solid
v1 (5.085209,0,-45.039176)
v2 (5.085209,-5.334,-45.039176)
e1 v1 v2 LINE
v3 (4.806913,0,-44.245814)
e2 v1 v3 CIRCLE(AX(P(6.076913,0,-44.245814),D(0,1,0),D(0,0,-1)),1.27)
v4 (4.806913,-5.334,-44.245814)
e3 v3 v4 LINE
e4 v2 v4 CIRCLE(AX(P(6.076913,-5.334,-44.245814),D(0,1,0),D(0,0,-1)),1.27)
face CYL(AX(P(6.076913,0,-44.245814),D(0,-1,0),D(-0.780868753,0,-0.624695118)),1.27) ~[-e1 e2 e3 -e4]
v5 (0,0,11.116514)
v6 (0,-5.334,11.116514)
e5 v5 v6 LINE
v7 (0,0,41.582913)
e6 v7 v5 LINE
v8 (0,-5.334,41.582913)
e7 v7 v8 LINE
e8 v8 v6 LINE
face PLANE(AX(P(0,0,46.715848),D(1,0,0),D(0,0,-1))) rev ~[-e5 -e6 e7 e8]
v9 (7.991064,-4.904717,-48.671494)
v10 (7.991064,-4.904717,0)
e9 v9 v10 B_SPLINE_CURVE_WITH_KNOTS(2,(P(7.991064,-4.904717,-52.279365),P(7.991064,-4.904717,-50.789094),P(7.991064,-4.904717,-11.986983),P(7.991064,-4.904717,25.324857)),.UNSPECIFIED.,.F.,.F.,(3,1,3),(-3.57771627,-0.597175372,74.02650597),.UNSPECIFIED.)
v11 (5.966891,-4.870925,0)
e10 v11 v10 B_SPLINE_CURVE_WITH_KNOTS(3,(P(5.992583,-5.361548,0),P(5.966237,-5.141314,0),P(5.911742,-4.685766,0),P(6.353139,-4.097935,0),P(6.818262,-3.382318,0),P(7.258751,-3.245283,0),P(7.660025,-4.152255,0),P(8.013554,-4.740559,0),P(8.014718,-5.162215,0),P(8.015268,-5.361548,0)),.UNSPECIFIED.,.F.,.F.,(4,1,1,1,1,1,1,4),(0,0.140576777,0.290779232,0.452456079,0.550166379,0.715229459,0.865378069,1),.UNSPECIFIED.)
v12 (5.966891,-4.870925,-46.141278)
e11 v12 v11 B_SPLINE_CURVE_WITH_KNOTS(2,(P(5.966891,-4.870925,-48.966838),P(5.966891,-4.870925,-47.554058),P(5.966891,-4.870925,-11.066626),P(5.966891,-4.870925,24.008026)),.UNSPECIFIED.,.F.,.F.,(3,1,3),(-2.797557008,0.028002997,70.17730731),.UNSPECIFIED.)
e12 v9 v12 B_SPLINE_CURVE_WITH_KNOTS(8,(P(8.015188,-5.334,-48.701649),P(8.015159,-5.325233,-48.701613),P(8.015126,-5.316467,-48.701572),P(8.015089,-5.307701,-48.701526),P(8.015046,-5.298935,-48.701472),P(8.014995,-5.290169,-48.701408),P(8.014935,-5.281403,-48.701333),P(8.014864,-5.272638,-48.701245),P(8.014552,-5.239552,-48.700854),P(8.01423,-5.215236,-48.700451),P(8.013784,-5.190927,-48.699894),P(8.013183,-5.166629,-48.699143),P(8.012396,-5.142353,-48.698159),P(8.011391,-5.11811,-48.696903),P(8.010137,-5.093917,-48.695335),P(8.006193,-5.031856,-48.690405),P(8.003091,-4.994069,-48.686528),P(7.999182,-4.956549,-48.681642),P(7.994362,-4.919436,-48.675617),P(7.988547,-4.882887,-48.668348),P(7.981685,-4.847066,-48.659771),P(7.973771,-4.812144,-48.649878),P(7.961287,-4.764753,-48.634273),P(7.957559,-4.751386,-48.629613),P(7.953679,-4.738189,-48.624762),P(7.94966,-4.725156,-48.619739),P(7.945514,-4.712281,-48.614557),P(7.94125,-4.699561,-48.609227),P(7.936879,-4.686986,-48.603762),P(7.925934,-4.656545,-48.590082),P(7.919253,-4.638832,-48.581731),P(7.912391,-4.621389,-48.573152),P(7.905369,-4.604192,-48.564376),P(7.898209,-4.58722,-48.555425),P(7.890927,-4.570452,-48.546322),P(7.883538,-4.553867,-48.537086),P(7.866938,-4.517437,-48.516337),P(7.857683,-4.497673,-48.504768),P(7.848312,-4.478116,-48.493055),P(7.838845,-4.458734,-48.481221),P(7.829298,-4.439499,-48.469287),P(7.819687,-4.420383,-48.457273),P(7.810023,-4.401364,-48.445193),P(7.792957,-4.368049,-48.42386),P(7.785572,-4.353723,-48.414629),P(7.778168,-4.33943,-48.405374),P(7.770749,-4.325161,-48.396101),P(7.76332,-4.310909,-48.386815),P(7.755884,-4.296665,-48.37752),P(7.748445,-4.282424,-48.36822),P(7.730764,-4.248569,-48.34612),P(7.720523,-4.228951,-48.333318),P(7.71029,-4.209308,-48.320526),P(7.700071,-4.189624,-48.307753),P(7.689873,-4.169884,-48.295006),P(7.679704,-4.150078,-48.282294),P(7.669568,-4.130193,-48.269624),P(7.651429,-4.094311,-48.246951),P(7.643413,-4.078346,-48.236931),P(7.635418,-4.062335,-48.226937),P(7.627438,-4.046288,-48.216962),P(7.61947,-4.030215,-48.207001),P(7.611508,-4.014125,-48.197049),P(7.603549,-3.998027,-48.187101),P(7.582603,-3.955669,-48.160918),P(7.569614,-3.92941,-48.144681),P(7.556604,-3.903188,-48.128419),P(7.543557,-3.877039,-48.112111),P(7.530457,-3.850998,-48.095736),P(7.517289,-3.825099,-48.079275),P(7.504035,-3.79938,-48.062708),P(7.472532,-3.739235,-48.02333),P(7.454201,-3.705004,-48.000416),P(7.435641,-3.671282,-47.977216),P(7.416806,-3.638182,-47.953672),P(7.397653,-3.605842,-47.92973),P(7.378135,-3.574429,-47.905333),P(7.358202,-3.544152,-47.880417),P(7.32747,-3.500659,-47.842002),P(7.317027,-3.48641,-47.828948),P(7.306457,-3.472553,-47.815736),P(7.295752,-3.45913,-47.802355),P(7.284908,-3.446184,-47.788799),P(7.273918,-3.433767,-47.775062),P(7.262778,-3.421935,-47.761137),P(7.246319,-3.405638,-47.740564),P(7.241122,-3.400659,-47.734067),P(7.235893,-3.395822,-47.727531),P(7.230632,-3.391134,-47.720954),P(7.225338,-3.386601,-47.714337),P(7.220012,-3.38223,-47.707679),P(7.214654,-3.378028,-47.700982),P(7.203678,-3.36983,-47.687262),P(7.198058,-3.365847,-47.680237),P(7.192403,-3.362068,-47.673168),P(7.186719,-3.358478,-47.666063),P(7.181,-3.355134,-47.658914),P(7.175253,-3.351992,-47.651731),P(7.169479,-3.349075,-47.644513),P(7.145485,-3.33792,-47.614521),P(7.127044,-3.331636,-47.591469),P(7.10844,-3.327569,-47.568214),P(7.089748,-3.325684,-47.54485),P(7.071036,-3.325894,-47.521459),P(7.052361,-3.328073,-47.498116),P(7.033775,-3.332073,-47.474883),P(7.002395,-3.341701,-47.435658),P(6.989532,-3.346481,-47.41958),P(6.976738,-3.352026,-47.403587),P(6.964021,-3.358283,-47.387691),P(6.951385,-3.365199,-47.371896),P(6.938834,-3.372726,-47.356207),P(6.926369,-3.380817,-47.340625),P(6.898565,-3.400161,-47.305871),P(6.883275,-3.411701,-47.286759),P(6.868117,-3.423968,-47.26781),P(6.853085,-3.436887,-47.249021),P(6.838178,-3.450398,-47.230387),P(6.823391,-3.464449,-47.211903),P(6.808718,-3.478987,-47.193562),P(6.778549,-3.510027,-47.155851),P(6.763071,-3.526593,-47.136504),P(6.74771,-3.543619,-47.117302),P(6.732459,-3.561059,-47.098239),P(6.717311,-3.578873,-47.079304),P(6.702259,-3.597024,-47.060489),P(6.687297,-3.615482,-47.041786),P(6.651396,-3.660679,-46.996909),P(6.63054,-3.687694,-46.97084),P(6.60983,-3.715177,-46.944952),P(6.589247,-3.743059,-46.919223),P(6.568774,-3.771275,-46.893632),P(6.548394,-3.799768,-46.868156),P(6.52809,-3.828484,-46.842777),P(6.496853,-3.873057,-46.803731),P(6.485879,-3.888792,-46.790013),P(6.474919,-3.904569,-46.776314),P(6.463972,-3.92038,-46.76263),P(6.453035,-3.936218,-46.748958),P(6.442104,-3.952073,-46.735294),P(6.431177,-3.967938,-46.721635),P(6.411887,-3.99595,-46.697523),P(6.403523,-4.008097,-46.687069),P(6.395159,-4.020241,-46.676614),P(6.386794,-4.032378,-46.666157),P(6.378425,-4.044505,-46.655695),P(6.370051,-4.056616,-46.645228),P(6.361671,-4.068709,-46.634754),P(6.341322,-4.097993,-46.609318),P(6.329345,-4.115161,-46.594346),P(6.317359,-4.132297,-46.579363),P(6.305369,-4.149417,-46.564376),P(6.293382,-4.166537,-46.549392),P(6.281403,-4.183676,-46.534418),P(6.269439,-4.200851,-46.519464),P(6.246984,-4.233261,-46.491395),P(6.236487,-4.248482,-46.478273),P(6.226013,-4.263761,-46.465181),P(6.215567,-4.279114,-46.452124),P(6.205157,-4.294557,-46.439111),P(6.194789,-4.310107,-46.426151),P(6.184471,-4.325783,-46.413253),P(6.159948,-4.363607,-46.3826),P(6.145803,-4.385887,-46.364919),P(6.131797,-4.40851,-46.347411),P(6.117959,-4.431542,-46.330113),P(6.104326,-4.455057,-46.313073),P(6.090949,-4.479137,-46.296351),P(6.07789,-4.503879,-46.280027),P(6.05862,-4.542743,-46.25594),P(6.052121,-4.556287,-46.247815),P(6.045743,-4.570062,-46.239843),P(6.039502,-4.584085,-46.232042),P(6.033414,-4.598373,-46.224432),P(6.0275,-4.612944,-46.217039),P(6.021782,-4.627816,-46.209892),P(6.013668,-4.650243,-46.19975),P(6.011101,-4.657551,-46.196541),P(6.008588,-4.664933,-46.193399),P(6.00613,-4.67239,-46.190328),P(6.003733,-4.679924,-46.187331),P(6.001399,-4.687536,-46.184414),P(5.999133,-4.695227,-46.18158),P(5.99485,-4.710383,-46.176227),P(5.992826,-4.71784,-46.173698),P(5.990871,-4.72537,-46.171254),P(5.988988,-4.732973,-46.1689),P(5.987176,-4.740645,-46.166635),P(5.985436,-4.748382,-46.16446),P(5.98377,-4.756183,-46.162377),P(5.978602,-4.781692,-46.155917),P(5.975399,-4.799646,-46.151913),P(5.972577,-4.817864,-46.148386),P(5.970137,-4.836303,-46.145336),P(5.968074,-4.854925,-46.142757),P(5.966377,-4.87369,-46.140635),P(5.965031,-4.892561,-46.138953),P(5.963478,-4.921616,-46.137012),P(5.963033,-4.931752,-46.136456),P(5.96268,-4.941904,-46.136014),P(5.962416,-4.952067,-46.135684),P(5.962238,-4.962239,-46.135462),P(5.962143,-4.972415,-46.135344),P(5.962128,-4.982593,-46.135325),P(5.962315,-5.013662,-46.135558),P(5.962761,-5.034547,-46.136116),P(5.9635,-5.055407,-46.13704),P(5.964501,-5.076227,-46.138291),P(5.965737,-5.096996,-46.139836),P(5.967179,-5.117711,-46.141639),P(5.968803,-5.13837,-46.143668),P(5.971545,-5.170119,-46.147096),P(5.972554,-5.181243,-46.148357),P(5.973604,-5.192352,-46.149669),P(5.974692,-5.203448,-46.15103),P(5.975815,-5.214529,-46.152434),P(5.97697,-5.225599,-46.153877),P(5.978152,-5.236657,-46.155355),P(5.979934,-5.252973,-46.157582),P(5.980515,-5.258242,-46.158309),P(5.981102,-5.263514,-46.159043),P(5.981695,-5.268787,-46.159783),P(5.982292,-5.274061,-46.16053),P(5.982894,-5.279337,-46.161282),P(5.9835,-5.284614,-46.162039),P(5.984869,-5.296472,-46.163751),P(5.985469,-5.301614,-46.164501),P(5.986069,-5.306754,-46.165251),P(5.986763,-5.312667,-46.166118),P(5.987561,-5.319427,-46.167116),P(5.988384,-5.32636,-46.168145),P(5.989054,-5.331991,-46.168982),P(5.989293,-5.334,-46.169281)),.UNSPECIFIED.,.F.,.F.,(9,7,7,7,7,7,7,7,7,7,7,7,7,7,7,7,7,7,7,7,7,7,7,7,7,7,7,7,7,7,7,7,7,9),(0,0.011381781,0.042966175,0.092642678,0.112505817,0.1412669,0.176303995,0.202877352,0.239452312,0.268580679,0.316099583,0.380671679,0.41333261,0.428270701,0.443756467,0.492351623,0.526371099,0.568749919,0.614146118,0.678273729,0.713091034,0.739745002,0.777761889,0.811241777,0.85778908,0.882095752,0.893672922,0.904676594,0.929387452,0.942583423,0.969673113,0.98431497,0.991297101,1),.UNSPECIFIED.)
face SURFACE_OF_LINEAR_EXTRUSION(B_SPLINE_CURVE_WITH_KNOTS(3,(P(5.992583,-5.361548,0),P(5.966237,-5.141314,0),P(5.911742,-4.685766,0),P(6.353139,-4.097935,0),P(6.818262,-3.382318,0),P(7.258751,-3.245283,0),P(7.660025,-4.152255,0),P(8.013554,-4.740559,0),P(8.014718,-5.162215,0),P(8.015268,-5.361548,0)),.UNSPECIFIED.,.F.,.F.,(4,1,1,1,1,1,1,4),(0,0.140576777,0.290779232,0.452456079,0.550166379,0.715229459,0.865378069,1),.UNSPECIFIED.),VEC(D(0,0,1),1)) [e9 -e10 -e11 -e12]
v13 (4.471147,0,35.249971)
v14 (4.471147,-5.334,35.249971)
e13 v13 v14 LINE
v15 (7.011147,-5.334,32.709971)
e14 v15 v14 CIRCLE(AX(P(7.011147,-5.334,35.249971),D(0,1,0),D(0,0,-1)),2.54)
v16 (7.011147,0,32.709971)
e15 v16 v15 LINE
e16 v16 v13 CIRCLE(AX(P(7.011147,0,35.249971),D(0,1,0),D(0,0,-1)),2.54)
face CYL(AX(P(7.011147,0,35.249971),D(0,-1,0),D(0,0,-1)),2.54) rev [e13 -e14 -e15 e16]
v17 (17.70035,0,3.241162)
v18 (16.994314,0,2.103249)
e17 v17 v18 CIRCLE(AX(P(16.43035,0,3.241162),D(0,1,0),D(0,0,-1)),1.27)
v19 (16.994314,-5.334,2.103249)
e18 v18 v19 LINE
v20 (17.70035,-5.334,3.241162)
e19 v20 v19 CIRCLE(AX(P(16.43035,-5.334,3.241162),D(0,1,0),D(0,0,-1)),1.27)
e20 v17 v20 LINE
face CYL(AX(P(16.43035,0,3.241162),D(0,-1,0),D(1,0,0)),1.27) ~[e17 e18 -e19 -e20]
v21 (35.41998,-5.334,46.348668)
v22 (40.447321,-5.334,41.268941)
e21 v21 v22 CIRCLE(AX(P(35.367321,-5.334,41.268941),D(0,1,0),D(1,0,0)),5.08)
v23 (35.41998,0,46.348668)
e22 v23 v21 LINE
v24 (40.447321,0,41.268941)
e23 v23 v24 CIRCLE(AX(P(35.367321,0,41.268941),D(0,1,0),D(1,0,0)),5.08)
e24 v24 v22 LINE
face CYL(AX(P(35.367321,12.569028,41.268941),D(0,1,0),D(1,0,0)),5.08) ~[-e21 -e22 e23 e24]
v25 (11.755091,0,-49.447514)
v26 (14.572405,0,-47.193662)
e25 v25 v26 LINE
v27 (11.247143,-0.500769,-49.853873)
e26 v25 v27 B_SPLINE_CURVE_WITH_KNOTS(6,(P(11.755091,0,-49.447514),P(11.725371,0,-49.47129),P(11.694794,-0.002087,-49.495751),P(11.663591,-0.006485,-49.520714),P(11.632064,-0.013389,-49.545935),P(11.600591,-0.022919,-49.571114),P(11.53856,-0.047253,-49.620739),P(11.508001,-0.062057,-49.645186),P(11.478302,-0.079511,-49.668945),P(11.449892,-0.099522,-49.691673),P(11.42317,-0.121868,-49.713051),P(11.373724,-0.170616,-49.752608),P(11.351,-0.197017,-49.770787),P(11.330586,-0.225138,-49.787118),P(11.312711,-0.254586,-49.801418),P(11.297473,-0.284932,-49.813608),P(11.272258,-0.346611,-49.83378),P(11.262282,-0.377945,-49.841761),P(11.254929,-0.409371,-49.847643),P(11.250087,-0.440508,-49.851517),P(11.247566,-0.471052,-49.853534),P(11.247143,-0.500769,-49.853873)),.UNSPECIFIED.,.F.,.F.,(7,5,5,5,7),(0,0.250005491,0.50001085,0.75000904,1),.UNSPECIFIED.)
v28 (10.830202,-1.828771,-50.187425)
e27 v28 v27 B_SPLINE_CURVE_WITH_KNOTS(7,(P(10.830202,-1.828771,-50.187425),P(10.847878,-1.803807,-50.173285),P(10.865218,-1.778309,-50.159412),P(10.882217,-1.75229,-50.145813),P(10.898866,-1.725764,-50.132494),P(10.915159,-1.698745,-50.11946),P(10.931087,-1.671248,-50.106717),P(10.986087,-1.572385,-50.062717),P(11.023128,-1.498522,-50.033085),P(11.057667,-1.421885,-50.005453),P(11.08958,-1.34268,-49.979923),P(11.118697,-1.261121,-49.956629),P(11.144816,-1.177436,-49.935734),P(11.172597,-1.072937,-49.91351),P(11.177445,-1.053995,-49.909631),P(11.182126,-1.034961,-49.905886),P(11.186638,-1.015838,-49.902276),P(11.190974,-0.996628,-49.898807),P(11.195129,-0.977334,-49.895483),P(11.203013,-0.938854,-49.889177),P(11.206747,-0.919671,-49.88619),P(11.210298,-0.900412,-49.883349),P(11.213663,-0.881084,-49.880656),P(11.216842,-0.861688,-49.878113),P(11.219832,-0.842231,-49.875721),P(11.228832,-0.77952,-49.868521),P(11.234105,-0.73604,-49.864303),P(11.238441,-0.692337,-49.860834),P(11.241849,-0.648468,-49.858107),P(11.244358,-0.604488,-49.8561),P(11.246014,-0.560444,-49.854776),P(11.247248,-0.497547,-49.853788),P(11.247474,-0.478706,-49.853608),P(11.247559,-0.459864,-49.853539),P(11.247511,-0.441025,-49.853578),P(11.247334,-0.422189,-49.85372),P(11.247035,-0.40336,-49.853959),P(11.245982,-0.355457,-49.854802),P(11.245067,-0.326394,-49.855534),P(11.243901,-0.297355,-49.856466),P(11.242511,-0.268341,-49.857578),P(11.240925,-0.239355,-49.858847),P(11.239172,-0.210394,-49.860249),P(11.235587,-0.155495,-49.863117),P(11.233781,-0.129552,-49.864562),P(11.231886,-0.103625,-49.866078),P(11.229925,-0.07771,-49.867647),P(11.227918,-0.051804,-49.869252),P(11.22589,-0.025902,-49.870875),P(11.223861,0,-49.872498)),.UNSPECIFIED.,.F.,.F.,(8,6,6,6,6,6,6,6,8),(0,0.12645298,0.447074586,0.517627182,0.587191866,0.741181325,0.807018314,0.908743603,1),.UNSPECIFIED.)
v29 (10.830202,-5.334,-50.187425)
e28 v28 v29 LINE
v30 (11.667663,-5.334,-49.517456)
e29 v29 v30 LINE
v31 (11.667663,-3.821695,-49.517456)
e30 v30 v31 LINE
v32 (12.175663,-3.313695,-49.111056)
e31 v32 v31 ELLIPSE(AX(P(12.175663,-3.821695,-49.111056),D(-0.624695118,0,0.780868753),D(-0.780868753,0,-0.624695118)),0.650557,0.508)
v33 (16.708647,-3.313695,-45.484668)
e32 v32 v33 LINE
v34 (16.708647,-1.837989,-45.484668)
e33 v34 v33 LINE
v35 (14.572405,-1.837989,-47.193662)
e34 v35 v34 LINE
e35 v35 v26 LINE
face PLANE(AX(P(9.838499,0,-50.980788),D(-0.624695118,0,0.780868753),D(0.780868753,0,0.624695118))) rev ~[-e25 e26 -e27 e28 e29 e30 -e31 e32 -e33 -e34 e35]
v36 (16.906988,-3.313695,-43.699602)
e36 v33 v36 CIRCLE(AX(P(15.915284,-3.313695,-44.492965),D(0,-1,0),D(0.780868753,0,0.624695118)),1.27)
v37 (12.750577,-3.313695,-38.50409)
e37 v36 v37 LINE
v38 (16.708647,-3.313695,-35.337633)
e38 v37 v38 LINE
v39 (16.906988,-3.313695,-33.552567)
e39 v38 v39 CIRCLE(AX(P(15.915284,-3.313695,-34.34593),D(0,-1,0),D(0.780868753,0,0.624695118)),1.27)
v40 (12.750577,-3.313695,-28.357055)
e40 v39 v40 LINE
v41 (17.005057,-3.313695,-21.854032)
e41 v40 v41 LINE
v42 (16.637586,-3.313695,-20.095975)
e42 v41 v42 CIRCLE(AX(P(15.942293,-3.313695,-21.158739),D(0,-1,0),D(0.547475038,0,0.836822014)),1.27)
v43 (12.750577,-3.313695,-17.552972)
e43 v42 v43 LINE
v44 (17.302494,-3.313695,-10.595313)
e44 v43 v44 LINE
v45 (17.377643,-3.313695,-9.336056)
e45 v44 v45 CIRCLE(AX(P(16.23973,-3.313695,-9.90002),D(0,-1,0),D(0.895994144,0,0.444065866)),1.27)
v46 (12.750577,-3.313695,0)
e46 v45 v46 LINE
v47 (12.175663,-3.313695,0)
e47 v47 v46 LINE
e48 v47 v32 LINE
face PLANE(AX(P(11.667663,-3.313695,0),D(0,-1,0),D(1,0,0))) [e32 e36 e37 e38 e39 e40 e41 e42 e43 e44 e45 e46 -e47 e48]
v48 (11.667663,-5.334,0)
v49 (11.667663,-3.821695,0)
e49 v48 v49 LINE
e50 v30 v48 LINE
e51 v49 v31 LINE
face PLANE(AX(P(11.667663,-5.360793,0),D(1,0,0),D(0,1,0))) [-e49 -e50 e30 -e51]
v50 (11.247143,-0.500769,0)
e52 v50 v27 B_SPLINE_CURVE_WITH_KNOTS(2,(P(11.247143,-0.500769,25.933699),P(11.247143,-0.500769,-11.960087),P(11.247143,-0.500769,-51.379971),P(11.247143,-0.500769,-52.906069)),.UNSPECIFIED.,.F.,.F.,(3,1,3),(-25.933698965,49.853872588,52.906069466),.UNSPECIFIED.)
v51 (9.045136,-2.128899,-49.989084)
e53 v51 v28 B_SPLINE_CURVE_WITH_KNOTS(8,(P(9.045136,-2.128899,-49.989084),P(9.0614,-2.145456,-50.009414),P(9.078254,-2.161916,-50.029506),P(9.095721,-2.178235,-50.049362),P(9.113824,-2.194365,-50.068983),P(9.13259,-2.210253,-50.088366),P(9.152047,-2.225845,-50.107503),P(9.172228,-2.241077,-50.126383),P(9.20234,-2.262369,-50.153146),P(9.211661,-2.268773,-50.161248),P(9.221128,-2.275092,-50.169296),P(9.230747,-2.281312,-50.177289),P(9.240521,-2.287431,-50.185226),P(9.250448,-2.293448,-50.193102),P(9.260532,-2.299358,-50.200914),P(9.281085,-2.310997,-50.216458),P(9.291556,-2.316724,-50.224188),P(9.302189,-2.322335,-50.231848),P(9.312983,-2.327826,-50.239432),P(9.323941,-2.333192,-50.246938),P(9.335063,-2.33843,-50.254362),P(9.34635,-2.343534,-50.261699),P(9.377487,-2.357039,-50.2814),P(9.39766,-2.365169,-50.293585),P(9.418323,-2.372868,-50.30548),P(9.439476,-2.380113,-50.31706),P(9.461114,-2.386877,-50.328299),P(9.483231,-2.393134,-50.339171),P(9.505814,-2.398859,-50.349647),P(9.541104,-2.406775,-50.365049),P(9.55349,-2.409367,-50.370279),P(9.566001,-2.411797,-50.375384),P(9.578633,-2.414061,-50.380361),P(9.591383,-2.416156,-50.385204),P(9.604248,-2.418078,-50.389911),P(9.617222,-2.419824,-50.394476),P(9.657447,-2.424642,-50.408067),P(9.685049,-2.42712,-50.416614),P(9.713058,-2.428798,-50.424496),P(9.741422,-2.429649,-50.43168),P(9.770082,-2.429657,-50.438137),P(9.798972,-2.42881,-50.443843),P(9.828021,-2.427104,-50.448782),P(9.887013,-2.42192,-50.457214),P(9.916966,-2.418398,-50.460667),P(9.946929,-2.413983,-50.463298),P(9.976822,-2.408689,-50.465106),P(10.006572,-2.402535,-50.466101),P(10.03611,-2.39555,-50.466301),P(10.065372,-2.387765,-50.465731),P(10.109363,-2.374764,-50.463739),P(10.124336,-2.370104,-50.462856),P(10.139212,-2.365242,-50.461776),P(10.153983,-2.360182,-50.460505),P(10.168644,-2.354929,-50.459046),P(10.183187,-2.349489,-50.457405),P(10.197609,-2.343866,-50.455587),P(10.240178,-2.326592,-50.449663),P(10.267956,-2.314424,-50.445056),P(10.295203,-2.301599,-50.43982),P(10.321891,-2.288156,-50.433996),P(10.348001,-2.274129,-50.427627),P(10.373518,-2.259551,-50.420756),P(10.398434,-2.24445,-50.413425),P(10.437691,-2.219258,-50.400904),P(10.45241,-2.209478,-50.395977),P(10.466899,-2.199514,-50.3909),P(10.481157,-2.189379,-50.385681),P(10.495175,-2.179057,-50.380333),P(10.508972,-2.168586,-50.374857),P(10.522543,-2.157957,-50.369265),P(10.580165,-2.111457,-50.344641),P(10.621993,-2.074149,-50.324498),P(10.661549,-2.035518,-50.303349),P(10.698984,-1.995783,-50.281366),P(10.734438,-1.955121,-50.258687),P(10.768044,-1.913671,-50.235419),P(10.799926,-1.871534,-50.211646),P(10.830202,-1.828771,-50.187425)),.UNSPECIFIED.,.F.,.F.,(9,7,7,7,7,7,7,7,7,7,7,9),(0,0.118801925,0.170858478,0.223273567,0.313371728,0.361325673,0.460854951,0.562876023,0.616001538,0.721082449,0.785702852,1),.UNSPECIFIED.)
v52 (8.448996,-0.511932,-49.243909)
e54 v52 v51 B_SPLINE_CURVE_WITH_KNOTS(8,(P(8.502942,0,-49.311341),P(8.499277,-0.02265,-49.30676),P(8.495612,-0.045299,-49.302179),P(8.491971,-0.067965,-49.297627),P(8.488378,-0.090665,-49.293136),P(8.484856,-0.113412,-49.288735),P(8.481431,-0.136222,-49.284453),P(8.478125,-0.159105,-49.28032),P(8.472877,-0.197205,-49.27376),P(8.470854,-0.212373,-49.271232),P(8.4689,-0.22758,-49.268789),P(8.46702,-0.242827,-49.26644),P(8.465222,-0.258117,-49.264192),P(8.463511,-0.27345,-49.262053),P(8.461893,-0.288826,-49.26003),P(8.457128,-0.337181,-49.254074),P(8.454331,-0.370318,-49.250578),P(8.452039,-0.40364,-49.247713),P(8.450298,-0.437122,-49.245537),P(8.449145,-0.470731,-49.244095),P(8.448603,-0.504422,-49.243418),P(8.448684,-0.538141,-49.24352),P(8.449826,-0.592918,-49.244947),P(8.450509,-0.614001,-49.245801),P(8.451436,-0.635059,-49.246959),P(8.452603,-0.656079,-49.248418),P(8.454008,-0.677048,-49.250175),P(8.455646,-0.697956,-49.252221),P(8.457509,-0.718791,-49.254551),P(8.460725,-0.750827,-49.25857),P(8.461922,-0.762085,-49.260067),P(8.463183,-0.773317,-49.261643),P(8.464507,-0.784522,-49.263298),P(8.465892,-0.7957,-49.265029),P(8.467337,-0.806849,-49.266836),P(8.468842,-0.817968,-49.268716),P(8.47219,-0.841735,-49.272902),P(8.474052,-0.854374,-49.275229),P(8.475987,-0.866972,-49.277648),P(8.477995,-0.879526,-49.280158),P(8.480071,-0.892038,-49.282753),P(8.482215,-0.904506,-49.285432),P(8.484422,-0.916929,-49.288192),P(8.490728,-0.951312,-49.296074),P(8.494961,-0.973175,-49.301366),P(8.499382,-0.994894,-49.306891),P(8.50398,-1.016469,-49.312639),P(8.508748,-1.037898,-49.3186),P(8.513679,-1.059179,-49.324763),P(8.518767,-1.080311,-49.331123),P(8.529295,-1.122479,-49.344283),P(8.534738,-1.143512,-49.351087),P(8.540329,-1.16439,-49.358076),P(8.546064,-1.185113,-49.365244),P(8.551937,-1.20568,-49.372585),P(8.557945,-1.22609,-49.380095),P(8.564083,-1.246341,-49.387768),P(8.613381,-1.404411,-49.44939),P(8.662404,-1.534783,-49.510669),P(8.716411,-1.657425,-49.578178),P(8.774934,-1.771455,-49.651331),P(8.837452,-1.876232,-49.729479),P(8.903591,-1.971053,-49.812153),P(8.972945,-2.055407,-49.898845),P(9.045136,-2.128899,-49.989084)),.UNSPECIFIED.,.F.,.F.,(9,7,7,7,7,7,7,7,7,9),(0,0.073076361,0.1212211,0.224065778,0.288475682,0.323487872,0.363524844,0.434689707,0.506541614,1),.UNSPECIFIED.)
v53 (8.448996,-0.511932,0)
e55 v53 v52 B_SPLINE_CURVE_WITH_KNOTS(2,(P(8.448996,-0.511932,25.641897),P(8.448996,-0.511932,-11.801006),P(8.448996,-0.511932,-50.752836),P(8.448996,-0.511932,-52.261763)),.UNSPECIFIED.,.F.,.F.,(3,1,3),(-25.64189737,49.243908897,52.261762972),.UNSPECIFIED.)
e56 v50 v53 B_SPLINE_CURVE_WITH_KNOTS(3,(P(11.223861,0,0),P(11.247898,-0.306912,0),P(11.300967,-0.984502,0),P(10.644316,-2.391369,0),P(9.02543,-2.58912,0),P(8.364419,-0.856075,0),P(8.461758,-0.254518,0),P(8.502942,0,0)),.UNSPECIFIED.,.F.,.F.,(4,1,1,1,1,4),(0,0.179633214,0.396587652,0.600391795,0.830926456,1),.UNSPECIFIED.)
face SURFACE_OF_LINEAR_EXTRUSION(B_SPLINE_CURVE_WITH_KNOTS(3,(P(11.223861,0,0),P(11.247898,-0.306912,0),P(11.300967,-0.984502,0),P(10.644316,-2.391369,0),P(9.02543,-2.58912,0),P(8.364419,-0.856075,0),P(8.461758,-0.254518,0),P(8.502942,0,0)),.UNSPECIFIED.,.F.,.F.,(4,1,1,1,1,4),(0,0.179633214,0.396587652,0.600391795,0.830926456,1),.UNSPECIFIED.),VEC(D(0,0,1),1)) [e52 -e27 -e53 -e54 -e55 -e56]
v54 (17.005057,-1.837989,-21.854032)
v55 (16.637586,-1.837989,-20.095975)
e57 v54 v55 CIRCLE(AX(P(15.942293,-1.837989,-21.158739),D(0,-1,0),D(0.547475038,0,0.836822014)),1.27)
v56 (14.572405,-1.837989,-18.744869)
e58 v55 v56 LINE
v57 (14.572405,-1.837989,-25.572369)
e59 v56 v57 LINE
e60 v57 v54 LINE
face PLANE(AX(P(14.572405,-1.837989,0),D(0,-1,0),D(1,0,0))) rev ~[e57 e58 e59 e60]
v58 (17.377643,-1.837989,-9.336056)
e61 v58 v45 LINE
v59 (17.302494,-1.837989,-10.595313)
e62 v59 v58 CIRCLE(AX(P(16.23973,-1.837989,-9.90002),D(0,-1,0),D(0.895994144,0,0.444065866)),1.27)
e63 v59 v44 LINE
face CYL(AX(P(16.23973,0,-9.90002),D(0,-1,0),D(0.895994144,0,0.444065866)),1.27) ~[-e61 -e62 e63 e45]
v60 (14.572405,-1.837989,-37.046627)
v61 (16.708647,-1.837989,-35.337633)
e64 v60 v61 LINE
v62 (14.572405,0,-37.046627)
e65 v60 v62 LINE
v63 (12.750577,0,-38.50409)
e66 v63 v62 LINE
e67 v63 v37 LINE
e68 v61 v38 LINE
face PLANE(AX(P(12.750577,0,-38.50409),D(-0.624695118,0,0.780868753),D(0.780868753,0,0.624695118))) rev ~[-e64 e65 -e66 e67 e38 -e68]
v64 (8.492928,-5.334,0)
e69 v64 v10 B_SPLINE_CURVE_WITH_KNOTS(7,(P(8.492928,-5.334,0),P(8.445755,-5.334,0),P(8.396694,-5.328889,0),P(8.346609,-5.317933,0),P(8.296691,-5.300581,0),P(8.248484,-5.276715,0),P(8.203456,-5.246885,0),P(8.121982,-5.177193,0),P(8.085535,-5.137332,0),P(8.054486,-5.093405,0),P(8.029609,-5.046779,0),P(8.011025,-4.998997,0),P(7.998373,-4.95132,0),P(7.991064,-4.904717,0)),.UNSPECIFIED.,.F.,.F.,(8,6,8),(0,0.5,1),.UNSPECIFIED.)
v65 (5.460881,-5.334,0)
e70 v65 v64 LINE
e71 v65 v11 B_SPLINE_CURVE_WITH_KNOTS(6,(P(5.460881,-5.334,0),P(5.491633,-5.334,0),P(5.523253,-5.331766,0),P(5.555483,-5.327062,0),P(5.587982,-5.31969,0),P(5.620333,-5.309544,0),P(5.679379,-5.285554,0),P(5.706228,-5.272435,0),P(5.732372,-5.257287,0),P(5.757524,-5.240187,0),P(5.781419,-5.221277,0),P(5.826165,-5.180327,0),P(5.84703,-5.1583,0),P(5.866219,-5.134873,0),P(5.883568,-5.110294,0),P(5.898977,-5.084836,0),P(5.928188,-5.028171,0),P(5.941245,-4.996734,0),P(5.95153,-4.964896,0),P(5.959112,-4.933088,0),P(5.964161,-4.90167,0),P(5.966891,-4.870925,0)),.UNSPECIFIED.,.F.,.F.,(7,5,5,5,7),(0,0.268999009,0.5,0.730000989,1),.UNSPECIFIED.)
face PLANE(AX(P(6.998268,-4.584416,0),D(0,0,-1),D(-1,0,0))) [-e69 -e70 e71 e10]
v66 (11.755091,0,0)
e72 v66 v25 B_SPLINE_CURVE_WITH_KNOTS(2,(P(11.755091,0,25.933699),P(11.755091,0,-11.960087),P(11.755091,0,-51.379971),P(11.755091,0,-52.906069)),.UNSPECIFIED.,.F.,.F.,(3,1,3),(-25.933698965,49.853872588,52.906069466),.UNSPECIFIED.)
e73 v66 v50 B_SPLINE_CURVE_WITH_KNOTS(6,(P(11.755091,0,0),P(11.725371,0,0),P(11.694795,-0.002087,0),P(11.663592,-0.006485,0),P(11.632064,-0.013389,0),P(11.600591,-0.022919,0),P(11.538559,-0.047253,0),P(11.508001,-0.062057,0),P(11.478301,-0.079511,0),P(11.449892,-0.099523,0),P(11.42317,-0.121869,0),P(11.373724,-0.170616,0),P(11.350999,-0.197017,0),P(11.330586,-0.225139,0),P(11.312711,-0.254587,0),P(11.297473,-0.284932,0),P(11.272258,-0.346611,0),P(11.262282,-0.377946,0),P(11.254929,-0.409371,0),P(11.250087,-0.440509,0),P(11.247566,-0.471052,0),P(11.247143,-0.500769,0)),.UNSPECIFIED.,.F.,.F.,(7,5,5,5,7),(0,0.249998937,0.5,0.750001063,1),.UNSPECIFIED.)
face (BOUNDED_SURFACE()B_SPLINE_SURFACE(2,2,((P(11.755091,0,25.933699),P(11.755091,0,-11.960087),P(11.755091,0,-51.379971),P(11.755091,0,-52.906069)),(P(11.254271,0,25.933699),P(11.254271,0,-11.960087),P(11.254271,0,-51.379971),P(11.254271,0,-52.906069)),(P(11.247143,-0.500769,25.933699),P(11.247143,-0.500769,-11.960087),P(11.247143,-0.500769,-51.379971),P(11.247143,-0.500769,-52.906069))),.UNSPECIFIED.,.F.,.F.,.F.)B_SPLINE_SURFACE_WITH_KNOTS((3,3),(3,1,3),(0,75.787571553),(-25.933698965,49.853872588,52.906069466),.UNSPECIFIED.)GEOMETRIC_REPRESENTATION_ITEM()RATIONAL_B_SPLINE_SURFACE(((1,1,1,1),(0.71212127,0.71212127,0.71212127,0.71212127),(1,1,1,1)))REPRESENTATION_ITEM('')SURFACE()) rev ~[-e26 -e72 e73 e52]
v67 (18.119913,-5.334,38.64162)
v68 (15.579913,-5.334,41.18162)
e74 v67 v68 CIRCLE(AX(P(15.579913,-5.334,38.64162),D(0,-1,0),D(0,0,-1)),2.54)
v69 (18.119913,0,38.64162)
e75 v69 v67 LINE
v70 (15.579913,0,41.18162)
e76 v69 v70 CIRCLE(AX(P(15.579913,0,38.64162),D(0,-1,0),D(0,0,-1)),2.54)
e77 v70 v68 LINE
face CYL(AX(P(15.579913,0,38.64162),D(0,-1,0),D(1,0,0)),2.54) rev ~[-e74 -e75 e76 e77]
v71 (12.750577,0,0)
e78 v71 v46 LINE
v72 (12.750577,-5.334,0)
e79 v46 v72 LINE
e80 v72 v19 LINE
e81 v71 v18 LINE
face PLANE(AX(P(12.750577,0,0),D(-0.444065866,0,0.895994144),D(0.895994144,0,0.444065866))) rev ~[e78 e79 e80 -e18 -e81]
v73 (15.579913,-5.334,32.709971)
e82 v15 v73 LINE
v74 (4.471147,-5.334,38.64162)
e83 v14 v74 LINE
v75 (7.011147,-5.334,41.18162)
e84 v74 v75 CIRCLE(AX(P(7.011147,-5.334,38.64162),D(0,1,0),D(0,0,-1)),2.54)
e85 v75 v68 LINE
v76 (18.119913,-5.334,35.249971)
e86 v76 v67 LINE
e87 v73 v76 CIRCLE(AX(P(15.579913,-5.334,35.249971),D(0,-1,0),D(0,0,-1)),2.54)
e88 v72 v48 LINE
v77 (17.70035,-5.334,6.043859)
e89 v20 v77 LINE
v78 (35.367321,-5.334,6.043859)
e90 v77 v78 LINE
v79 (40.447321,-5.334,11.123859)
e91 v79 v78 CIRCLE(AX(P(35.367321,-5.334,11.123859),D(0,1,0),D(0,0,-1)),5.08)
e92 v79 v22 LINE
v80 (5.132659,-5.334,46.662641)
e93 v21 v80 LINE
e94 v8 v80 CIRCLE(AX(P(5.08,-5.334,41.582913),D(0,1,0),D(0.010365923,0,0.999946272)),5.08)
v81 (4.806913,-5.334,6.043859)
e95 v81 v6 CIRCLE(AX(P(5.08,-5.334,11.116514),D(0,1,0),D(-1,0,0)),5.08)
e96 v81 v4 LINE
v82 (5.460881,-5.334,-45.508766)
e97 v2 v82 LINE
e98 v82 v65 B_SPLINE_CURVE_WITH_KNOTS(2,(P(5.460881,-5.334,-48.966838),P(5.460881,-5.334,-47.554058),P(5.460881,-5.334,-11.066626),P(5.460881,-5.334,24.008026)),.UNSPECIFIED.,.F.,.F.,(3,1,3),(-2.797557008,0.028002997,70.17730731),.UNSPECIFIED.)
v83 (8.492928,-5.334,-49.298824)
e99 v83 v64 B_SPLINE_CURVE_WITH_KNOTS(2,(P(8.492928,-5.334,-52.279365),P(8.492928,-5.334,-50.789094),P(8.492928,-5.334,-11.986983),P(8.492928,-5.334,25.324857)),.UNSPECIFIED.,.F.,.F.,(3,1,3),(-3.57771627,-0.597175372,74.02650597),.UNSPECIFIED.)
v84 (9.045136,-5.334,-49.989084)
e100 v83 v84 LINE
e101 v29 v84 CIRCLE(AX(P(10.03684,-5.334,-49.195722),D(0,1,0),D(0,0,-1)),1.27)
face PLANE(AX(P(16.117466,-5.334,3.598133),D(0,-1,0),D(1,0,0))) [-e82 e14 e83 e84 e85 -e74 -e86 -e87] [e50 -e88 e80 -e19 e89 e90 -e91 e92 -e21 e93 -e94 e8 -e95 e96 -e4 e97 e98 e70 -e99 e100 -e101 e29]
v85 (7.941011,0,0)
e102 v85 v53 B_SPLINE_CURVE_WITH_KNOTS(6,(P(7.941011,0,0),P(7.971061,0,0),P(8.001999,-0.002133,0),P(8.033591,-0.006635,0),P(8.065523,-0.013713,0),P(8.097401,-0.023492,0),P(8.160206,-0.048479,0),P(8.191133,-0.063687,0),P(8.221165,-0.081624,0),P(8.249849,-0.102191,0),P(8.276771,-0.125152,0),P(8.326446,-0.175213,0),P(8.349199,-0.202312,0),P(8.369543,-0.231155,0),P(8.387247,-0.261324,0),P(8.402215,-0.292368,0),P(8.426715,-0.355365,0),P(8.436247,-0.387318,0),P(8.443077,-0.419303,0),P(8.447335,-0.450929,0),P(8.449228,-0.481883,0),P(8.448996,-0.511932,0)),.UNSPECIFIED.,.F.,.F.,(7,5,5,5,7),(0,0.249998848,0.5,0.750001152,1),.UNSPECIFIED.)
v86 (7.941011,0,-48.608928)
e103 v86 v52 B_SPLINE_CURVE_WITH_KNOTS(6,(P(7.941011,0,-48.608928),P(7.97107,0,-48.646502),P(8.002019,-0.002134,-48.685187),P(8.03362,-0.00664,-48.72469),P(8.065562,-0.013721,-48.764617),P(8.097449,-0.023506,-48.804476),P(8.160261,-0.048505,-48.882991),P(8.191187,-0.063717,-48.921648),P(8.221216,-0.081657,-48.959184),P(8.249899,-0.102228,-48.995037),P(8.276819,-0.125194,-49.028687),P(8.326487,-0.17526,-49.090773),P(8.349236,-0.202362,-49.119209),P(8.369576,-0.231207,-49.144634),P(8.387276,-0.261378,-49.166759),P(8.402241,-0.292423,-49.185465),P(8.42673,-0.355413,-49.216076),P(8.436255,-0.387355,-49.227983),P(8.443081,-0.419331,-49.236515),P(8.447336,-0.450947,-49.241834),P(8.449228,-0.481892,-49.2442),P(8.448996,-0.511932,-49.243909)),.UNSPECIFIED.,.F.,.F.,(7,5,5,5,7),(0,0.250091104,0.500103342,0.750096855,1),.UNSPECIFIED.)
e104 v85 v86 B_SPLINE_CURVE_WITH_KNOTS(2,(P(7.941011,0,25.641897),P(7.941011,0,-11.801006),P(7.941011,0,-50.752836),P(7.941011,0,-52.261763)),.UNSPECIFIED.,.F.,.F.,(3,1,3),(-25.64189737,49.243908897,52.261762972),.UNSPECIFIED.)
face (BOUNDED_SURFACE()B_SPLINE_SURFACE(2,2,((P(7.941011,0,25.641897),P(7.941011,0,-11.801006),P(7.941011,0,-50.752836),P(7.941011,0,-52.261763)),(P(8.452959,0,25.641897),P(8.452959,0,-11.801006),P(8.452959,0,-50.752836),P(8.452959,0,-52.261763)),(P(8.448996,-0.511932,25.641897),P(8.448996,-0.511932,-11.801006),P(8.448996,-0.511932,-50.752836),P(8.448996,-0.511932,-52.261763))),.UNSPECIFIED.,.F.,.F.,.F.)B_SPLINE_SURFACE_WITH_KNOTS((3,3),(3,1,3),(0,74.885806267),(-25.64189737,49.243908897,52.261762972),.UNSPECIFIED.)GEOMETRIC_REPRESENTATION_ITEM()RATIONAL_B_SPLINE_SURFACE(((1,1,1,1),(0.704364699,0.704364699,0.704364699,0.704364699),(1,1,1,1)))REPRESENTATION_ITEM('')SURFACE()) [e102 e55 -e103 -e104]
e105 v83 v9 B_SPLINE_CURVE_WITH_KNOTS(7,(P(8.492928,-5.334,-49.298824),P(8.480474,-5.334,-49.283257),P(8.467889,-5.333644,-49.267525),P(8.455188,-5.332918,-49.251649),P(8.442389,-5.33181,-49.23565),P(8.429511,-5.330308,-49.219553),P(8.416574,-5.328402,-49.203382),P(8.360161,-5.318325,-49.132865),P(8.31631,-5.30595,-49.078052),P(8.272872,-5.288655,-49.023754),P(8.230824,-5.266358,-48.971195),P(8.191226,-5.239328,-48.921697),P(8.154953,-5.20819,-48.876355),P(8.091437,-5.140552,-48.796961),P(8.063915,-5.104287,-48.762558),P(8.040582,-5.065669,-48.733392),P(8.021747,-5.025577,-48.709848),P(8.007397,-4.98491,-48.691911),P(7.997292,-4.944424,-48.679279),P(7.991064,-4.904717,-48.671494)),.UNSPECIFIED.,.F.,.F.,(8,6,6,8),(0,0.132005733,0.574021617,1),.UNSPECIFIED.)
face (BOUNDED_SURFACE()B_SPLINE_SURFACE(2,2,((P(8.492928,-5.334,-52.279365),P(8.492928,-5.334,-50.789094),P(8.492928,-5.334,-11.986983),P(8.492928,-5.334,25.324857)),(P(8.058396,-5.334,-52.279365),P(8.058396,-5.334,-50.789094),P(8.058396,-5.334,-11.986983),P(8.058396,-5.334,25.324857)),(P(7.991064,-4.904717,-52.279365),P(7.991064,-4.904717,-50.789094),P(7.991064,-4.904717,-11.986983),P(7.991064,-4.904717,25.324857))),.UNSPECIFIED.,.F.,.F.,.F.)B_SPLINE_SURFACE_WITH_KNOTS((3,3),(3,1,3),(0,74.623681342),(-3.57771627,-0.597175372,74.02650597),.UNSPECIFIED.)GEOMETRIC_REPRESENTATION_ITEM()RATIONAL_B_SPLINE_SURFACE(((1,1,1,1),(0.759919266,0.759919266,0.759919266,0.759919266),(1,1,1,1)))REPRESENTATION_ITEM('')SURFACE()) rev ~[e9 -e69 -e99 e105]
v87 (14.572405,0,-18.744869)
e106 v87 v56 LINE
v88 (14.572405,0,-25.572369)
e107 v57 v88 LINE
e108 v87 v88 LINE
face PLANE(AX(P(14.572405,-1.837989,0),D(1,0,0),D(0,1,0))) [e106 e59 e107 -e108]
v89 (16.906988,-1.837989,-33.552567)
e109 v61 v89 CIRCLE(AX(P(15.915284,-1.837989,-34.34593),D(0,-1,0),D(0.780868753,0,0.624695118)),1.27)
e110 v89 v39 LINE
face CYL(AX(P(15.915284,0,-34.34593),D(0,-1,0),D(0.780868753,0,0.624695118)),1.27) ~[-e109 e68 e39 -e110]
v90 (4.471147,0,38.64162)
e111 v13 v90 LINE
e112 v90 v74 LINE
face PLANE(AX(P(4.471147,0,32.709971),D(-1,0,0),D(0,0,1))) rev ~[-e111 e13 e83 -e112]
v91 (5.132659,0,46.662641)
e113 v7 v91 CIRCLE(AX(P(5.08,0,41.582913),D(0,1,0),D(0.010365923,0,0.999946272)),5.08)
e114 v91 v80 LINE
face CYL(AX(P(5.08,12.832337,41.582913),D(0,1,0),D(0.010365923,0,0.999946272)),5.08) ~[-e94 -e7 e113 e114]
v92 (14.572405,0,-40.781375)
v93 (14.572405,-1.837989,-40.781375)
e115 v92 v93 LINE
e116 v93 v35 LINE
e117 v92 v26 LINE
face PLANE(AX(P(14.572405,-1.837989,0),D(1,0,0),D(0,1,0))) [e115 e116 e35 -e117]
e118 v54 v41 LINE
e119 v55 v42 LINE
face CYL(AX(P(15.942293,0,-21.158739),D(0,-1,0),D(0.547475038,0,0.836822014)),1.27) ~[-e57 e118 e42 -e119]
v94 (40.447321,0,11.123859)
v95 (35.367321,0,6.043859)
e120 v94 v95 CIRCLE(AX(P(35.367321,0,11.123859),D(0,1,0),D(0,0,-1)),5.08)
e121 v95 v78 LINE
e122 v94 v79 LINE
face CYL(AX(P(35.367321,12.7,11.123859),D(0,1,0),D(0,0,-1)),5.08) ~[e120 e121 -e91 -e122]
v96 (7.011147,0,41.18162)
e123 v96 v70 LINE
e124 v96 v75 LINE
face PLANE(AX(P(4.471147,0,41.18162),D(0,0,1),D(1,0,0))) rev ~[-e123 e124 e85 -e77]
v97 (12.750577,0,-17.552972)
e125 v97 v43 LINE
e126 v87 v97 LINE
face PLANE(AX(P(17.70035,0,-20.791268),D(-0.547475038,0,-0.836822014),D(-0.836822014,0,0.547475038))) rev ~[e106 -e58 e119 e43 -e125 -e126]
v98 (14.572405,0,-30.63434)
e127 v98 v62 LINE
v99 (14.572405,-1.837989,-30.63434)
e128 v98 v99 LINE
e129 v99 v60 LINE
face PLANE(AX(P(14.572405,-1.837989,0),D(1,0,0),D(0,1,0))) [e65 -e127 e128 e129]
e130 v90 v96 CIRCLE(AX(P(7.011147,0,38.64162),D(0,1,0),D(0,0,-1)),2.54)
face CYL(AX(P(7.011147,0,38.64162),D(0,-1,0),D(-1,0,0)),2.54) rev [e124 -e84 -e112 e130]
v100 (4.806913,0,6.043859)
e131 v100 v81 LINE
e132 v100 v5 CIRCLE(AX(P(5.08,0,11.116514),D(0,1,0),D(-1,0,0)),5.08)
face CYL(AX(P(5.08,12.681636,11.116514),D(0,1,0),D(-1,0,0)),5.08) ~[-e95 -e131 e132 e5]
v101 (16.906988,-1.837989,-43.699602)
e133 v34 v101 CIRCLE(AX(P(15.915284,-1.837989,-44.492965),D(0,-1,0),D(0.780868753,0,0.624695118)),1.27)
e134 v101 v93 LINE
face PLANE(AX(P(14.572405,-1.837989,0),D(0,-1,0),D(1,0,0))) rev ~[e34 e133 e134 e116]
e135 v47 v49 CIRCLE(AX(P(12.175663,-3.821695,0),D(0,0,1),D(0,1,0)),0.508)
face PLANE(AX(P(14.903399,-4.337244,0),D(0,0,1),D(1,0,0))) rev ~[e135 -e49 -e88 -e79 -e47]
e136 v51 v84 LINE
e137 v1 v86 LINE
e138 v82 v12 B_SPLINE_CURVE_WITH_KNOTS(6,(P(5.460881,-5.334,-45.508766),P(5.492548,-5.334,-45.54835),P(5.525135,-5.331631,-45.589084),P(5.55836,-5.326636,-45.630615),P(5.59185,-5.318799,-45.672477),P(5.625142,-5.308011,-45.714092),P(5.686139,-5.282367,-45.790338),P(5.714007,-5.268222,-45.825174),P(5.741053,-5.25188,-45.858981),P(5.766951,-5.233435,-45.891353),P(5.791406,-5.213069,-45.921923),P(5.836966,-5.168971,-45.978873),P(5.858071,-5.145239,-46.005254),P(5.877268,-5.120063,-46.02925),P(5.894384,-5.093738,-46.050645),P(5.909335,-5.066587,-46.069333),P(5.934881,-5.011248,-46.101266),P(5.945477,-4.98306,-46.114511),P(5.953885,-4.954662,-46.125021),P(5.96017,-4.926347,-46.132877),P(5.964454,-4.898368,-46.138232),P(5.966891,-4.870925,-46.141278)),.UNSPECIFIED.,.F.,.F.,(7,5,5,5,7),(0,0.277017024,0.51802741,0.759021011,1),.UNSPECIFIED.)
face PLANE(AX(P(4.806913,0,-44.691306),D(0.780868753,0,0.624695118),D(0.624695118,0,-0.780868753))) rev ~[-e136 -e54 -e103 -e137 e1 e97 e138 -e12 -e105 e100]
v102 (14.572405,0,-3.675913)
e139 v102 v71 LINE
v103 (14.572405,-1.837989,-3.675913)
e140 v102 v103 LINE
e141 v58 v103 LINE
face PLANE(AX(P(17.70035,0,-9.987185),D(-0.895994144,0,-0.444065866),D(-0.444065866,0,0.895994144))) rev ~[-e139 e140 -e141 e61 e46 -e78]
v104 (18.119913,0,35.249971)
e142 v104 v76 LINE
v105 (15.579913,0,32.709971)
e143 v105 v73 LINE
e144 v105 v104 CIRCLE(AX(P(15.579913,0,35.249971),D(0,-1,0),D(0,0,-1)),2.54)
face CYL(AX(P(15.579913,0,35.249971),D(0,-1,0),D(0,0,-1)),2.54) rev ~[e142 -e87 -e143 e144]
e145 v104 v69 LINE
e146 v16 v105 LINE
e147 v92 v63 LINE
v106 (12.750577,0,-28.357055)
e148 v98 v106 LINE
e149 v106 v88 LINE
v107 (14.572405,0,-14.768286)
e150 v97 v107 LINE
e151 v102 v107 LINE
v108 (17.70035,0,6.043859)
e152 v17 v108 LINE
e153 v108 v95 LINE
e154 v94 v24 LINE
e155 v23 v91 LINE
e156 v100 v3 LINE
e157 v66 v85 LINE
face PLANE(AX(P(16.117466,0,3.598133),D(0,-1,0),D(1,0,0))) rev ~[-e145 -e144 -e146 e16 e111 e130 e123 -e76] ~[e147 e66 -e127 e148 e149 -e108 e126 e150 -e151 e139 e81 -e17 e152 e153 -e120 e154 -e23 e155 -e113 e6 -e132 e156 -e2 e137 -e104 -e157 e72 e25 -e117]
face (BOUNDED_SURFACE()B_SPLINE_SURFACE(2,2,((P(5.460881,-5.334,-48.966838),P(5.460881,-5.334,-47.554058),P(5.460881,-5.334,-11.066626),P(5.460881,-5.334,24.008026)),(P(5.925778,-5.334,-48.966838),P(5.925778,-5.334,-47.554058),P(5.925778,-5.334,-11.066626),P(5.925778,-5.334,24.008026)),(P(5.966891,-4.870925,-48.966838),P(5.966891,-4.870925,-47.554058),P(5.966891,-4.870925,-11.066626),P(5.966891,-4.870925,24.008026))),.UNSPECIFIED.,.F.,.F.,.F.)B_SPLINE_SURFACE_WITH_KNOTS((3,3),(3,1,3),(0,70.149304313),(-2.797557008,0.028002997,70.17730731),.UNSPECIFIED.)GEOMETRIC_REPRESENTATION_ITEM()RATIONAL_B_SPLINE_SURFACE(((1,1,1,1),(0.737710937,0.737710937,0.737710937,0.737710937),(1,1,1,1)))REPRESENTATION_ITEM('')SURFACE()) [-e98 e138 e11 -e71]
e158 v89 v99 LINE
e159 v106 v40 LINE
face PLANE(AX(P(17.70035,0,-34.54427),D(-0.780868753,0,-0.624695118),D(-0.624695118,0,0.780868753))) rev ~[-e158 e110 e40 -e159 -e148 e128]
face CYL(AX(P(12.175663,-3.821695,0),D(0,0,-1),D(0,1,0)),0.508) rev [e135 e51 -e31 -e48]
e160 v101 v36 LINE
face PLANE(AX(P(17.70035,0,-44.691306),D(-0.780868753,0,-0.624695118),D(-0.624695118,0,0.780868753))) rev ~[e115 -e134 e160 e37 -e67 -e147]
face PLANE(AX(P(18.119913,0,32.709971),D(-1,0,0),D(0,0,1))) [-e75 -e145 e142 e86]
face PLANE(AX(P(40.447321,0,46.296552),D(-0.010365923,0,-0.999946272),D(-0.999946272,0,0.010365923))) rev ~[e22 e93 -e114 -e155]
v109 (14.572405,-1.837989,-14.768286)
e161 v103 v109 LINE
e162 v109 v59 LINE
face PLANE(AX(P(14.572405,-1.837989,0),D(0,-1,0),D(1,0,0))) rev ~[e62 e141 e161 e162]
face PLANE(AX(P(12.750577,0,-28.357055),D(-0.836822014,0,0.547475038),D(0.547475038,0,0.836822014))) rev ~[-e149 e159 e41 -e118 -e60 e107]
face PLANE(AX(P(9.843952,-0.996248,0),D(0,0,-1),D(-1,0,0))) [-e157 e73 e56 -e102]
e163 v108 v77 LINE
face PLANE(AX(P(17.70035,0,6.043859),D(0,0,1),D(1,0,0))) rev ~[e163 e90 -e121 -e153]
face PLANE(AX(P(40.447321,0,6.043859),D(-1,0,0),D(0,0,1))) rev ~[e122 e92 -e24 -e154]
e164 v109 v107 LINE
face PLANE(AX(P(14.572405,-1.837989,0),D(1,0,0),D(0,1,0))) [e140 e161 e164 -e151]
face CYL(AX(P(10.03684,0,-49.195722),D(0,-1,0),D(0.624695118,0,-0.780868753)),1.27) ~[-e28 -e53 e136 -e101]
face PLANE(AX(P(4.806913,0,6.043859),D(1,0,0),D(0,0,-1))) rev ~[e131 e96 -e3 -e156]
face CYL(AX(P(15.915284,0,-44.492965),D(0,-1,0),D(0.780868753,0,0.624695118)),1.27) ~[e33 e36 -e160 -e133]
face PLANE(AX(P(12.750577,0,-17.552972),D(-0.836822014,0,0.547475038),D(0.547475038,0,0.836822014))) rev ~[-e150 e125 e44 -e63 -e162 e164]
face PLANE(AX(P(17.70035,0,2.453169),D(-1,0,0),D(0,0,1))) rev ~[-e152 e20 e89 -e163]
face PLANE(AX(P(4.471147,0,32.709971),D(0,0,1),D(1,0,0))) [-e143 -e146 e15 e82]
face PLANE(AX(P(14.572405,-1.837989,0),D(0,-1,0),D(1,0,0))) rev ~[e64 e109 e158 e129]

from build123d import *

# Parameters (mm, degrees)
F0_W        = 13.6487651616
F0_H        = 8.4716491401
F1_DEPTH    = 5.334
F2_T1_DEPTH = 30.734
F2_T3_DEPTH = 30.9986733357
F2_T5_DEPTH = 30.6972722749
F2_T7_DEPTH = 30.472056174
F3_R        = 2.54
F4_R        = 1.27
F6_DEPTH    = 52.1462
F7_W        = 6.471471861
F7_H        = 2.0470987074
F8_DEPTH    = 58.928
F9_W        = 3.0602971092
F9_H        = 1.8379887333
F10_DEPTH   = 54.61
F12_DEPTH   = 55.626
F13_R       = 0.508


# Not quite as in the source:
# - a fillet or chamfer that OpenCascade refuses, or shapes differently, is made with other operations: its cross-section is extruded or revolved along the edge and cut away or added


with BuildPart() as f1:
    # F0 (on Front) → F1 (new body)
    with BuildSketch(Plane.XZ):
        Polygon((40.4473207891, 46.2965518236), (0, 46.7158481479), (0, 6.0438592918), (4.8069125041, 6.0438592918), (4.8069125041, -44.6913056076), (9.8384991288, -50.9807877243), (17.7003503195, -44.6913056076), (12.7505768579, -38.5040899258), (17.7003503195, -34.5442704236), (12.7505768579, -28.3570547418), (17.7003503195, -20.7912679762), (12.7505768579, -17.5529719363), (17.7003503195, -9.9871851707), (12.7505768579, 0), (17.7003503195, 2.4531694269), (17.7003503195, 6.0438592918), (40.4473207891, 6.0438592918), align=None)
        with Locations((11.2955300137, 36.9457956403)):
            Rectangle(F0_W, F0_H, mode=Mode.SUBTRACT)
    extrude(amount=F1_DEPTH)

    # F2: fillet of radius 5.08 on 4 edges, made by hand

    # F2_s2 → F2_t1 (cut)
    with BuildSketch(Plane.XZ.offset(-12.7)):
        with BuildLine():
            ThreePointArc((35.3673207891, 6.0438592918), (38.9594232375, 7.5317568434), (40.4473207891, 11.1238592918))
            Line((40.4473207891, 11.1238592918), (40.4473207891, 6.0438592918))
            Line((40.4473207891, 6.0438592918), (35.3673207891, 6.0438592918))
        make_face()
    extrude(amount=F2_T1_DEPTH, mode=Mode.SUBTRACT)

    # F2_s4 → F2_t3 (cut)
    with BuildSketch(Plane.XZ.offset(-12.8323366678)):
        with BuildLine():
            ThreePointArc((5.1326588868, 46.6626405444), (1.5065637787, 45.1935856581), (0, 41.5829134807))
            Line((0, 41.5829134807), (0, 46.7158481479))
            Line((0, 46.7158481479), (5.1326588868, 46.6626405444))
        make_face()
    extrude(amount=F2_T3_DEPTH, mode=Mode.SUBTRACT)

    # F2_s6 → F2_t5 (cut)
    with BuildSketch(Plane.XZ.offset(-12.6816361374)):
        with BuildLine():
            ThreePointArc((0, 11.1165137468), (1.392610376, 7.6222959859), (4.8069125041, 6.0438592918))
            Line((4.8069125041, 6.0438592918), (0, 6.0438592918))
            Line((0, 6.0438592918), (0, 11.1165137468))
        make_face()
    extrude(amount=F2_T5_DEPTH, mode=Mode.SUBTRACT)

    # F2_s8 → F2_t7 (cut)
    with BuildSketch(Plane.XZ.offset(-12.569028087)):
        with BuildLine():
            ThreePointArc((40.4473207891, 41.2689405888), (38.9779929665, 44.8423768101), (35.4199796759, 46.3486676525))
            Line((35.4199796759, 46.3486676525), (40.4473207891, 46.2965518236))
            Line((40.4473207891, 46.2965518236), (40.4473207891, 41.2689405888))
        make_face()
    extrude(amount=F2_T7_DEPTH, mode=Mode.SUBTRACT)

    # F3
    f3_edges = [f1.edges().sort_by_distance(p)[0] for p in [
        (18.119913, -2.667, 41.18162),
        (4.471147, -2.667, 41.18162),
        (4.471147, -2.667, 32.709971),
        (18.119913, -2.667, 32.709971),
    ]]
    fillet(f3_edges, radius=F3_R)

    # F4
    f4_edges = [f1.edges().sort_by_distance(p)[0] for p in [
        (17.70035, -2.667, 2.453169),
        (17.70035, -2.667, -9.987185),
        (17.70035, -2.667, -20.791268),
        (17.70035, -2.667, -34.54427),
        (17.70035, -2.667, -44.691306),
        (9.838499, -2.667, -50.980788),
        (4.806913, -2.667, -44.691306),
    ]]
    fillet(f4_edges, radius=F4_R)

    # F5 (on Top) → F6 (cut)
    with BuildSketch(Plane.XY):
        with BuildLine():
            add(Edge.make_bspline(
                [(5.9925829992, -5.3615476936), (5.9662371728, -5.1413136829), (5.9117415486, -4.685765632), (6.3531394911, -4.0979348233), (6.8182620743, -3.382318142), (7.2587507478, -3.2452825018), (7.6600250696, -4.1522550659), (8.0135536671, -4.7405594262), (8.0147180391, -5.162214979), (8.0152684823, -5.3615476936)],
                knots=[0, 0, 0, 0, 0.1405767765, 0.2907792323, 0.4524560789, 0.5501663785, 0.7152294594, 0.8653780686, 1, 1, 1, 1], degree=3))
            Line((5.9925829992, -5.3615476936), (8.0152684823, -5.3615476936))
        make_face()
    extrude(amount=-F6_DEPTH, mode=Mode.SUBTRACT)

    # F7 (on Top) → F8 (cut)
    with BuildSketch(Plane.XY):
        with Locations((14.903399162, -4.3372439686)):
            Rectangle(F7_W, F7_H)
    extrude(amount=-F8_DEPTH, mode=Mode.SUBTRACT)

    # F9 (on Top) → F10 (cut)
    with BuildSketch(Plane.XY):
        with Locations((16.1025538109, -0.9189943667)):
            Rectangle(F9_W, F9_H)
    extrude(amount=-F10_DEPTH, mode=Mode.SUBTRACT)

    # F11 (on Top) → F12 (cut)
    with BuildSketch(Plane.XY):
        with BuildLine():
            add(Edge.make_bspline(
                [(11.2238610163, 0), (11.2478981656, -0.3069122797), (11.3009665063, -0.984502007), (10.6443157535, -2.3913685017), (9.025430434, -2.589119864), (8.3644189358, -0.856075456), (8.4617577104, -0.2545179476), (8.5029415786, 0)],
                knots=[0, 0, 0, 0, 0.1796332137, 0.3965876516, 0.6003917954, 0.8309264556, 1, 1, 1, 1], degree=3))
            Line((11.2238610163, 0), (8.5029415786, 0))
        make_face()
    extrude(amount=-F12_DEPTH, mode=Mode.SUBTRACT)

    # F13
    f13_edges = [f1.edges().sort_by_distance(p)[0] for p in [
        (8.015188, -5.334, -24.350824),
        (5.989293, -5.334, -23.084641),
        (11.223861, 0, -24.936249),
        (8.502942, 0, -24.655671),
        (11.667663, -3.313695, -24.758728),
    ]]
    fillet(f13_edges, radius=F13_R)


solid = f1.part
